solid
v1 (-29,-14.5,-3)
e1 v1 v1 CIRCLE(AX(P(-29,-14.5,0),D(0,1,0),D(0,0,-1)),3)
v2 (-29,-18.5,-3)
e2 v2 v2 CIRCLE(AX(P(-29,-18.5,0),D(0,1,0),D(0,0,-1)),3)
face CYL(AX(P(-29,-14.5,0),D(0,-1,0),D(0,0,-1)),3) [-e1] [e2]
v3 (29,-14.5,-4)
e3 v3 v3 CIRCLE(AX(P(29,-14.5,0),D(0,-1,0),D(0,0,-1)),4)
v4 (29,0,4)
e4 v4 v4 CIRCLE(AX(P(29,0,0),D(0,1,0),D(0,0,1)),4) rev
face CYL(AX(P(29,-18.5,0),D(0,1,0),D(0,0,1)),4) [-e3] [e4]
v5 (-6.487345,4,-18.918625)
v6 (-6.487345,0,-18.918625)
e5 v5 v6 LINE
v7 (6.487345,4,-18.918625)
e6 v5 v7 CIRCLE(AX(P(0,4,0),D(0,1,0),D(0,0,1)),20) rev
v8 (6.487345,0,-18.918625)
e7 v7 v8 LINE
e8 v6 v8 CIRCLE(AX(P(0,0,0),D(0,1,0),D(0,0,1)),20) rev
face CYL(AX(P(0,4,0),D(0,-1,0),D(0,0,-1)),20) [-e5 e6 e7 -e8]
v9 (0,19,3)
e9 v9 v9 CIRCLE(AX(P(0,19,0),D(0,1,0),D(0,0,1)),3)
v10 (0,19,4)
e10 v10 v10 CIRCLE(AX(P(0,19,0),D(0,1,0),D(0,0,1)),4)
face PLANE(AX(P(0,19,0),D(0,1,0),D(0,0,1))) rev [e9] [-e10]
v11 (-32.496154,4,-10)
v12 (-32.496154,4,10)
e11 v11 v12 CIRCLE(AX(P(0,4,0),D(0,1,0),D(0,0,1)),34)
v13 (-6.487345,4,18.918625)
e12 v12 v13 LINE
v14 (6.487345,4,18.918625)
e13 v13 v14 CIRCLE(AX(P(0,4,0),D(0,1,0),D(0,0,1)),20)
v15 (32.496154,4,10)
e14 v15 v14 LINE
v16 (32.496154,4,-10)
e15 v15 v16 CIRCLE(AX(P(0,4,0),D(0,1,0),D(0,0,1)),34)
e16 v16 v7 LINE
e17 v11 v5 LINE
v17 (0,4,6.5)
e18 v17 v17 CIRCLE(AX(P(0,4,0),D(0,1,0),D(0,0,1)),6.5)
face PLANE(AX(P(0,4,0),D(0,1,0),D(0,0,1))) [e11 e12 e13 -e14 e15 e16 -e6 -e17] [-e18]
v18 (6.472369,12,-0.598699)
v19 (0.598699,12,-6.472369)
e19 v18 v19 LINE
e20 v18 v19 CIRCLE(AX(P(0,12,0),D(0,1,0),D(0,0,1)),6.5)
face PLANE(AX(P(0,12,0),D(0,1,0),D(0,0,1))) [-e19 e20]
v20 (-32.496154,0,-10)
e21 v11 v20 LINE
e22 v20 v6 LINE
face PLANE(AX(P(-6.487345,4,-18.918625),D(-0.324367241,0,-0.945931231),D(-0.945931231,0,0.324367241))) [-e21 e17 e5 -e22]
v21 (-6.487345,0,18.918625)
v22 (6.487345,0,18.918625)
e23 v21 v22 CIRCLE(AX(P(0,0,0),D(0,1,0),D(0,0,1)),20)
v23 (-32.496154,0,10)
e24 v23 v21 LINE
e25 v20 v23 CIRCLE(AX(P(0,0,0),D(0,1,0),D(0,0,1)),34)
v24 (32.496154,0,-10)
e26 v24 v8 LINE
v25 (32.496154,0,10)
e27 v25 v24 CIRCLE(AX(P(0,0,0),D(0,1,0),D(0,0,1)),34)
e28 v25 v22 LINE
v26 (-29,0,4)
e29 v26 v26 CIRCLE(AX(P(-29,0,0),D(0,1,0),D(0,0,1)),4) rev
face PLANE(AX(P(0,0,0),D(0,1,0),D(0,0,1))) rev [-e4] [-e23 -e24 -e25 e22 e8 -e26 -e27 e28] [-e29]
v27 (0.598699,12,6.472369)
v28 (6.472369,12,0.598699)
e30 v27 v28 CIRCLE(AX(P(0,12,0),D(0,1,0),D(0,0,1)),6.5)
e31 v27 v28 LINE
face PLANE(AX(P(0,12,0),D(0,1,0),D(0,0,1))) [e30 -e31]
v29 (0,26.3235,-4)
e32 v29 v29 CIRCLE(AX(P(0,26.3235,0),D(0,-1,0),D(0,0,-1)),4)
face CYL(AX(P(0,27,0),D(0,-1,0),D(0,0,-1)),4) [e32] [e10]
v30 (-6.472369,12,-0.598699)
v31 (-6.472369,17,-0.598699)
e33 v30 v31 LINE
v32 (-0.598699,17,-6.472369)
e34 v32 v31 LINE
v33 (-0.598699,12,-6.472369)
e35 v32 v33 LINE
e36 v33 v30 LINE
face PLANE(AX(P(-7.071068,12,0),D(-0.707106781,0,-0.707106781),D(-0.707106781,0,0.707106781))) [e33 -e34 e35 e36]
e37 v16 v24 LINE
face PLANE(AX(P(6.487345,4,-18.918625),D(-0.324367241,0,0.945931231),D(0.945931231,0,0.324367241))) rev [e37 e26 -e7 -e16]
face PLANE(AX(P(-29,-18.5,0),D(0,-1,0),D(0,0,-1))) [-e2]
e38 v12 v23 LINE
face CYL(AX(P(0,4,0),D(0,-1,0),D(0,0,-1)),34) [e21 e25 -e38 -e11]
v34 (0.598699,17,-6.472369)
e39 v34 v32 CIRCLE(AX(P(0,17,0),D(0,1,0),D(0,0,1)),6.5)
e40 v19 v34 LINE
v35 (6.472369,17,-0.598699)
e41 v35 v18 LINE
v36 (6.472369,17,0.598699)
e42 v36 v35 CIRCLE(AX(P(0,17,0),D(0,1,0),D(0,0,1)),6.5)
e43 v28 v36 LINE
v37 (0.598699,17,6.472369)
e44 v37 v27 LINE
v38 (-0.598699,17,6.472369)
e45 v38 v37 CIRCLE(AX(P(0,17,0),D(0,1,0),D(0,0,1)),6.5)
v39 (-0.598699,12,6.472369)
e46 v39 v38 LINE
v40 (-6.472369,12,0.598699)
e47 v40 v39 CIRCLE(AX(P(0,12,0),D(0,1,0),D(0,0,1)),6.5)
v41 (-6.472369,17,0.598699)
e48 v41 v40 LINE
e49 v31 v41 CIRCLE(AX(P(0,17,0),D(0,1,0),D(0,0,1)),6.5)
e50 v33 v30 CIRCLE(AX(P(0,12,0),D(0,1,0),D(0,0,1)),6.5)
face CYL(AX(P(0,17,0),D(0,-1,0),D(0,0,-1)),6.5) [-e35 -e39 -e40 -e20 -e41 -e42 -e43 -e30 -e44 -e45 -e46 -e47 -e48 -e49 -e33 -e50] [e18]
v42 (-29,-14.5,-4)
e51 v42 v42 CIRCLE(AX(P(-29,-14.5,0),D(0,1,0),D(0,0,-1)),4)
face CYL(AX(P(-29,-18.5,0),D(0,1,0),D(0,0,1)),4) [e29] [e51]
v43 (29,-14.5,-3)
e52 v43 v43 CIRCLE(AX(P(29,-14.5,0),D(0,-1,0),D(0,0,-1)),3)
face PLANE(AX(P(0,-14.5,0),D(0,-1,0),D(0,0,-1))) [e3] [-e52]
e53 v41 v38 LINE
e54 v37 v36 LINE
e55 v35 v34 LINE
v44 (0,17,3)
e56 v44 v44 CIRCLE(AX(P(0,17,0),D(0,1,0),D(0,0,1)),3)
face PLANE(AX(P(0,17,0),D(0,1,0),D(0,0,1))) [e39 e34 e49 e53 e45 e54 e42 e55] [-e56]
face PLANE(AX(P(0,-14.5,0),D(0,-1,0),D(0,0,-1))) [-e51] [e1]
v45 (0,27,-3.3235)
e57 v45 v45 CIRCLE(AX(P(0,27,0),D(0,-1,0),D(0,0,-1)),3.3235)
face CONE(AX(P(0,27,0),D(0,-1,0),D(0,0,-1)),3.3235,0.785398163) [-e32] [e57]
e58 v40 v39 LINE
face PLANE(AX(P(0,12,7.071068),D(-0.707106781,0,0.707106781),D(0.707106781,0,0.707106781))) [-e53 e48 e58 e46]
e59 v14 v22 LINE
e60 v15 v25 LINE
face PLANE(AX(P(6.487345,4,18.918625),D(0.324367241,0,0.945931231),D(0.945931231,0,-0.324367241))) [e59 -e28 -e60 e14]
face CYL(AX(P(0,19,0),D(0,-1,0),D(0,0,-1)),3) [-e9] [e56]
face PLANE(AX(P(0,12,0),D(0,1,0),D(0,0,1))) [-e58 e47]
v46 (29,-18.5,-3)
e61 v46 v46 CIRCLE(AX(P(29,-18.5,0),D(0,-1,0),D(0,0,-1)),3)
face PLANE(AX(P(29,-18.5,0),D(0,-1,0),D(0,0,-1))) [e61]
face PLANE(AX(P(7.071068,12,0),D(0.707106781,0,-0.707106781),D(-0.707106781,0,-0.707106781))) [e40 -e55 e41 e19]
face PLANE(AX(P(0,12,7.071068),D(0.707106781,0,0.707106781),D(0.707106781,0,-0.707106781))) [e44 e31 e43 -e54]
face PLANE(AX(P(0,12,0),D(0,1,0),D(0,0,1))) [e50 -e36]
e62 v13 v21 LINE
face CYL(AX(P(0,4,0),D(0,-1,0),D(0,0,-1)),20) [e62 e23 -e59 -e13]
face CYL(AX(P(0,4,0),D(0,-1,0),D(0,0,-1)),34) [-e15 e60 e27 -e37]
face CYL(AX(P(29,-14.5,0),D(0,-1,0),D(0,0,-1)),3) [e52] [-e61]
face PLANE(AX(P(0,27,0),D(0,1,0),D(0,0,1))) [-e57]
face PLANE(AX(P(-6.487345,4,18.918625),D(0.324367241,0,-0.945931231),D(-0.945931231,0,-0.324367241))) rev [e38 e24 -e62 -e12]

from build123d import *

# Parameters (mm, degrees)
EXTRUDE_1_DEPTH      = 4
SKETCH_2_R           = 6.5
EXTRUDE_2_DEPTH      = 13
SKETCH_3_R           = 4
EXTRUDE_3_DEPTH      = 10
SKETCH_4_OUTSIDE_W   = 86.676
SKETCH_4_OUTSIDE_H   = 58.676
SKETCH_4_OUTSIDE_R   = 3
CUT_EXTRUDE_1_DEPTH  = 2
SKETCH_6_OUTSIDE_W   = 86.676
SKETCH_6_OUTSIDE_H   = 58.676
CUT_EXTRUDE_2_DEPTH  = 5
SKETCH_7_R           = 4
EXTRUDE_4_DEPTH      = 18.5
SKETCH_8_OUTSIDE_W   = 88.214
SKETCH_8_OUTSIDE_H   = 60.214
SKETCH_8_OUTSIDE_R   = 3
CUT_EXTRUDE_3_DEPTH  = 4
MIRROR_START         = -14.5
MIRROR_1_OUTLINE_R   = 4
MIRROR_1_DEPTH       = 14.5
MIRROR_START_2       = -18.5
MIRROR_1_2_OUTLINE_R = 3
MIRROR_1_2_DEPTH     = 4


# Read off the part's stored shape, not the designer's step: M8 机械螺纹 螺柱1, 镜向1
with BuildPart() as part:
    # 草图1 → 凸台-拉伸1 (new body)
    with BuildSketch(Plane(origin=(0, 0, 0), x_dir=(1, 0, 0), z_dir=(0, 1, 0))):
        with BuildLine():
            Line((-6.487344821, 18.918624611), (-32.496153619, 10))
            ThreePointArc((-32.496153619, 10), (-34, 0), (-32.496153619, -10))
            Line((-32.496153619, -10), (-6.487344821, -18.918624611))
            ThreePointArc((-6.487344821, -18.918624611), (0, -20), (6.487344821, -18.918624611))
            Line((6.487344821, -18.918624611), (32.496153619, -10))
            ThreePointArc((32.496153619, -10), (33.621936463, -5.056222749), (34, 0))
            ThreePointArc((34, 0), (33.621936463, 5.056222749), (32.496153619, 10))
            Line((32.496153619, 10), (6.487344821, 18.918624611))
            ThreePointArc((6.487344821, 18.918624611), (0, 20), (-6.487344821, 18.918624611))
        make_face()
    extrude(amount=EXTRUDE_1_DEPTH)

    # 草图2 → 凸台-拉伸2 (add)
    with BuildSketch(Plane(origin=(0, 4, 0), x_dir=(1, 0, 0), z_dir=(0, 1, 0))):
        with Locations(Location((0, 0, 0), (0, 0, 90))):
            Circle(SKETCH_2_R)
    extrude(amount=EXTRUDE_2_DEPTH)

    # 草图3 → 凸台-拉伸3 (add)
    with BuildSketch(Plane(origin=(0, 17, 0), x_dir=(1, 0, 0), z_dir=(0, 1, 0))):
        with Locations(Location((0, 0, 0), (0, 0, 270))):
            Circle(SKETCH_3_R)
    extrude(amount=EXTRUDE_3_DEPTH)

    # 草图4 outside → 切除-拉伸1 (cut)
    with BuildSketch(Plane(origin=(0, 17, 0), x_dir=(1, 0, 0), z_dir=(0, 1, 0))):
        Rectangle(SKETCH_4_OUTSIDE_W, SKETCH_4_OUTSIDE_H)
        with Locations(Location((0, 0, 0), (0, 0, 270))):
            Circle(SKETCH_4_OUTSIDE_R, mode=Mode.SUBTRACT)
    extrude(amount=CUT_EXTRUDE_1_DEPTH, mode=Mode.SUBTRACT)

    # M8 机械螺纹 螺柱1 outline → M8 机械螺纹 螺柱1 (revolve, cut)
    with BuildSketch(Plane.XY):
        Polygon((4, 27), (3.3235, 27), (4, 26.3235), align=None)
    revolve(axis=Axis((0, 0, 0), (0, 1, 0)), mode=Mode.SUBTRACT)

    # 草图6 outside → 切除-拉伸2 (cut)
    with BuildSketch(Plane(origin=(0, 17, 0), x_dir=(1, 0, 0), z_dir=(0, 1, 0))):
        Rectangle(SKETCH_6_OUTSIDE_W, SKETCH_6_OUTSIDE_H)
        Polygon((0, -7.071067812), (7.071067812, 0), (0, 7.071067812), (-7.071067812, 0), align=None, mode=Mode.SUBTRACT)
    extrude(amount=-CUT_EXTRUDE_2_DEPTH, mode=Mode.SUBTRACT)

    # 草图7 → 凸台-拉伸4 (add)
    with BuildSketch(Plane.XZ):
        with Locations(Location((29, 0, 0), (0, 0, 90))):
            Circle(SKETCH_7_R)
    extrude(amount=EXTRUDE_4_DEPTH)

    # 草图8 outside → 切除-拉伸3 (cut)
    with BuildSketch(Plane.XZ.offset(18.5)):
        Rectangle(SKETCH_8_OUTSIDE_W, SKETCH_8_OUTSIDE_H)
        with Locations(Location((29, 0, 0), (0, 0, 270))):
            Circle(SKETCH_8_OUTSIDE_R, mode=Mode.SUBTRACT)
    extrude(amount=-CUT_EXTRUDE_3_DEPTH, mode=Mode.SUBTRACT)

    # 镜向1 outline → 镜向1 (add)
    with BuildSketch(Plane(origin=(0, 0, 0), x_dir=(1, 0, 0), z_dir=(0, 1, 0)).offset(MIRROR_START)):
        with Locations((-29, 0)):
            Circle(MIRROR_1_OUTLINE_R)
    extrude(amount=MIRROR_1_DEPTH)

    # Mirror 1 2 outline → Mirror 1 2 (add)
    with BuildSketch(Plane(origin=(0, 0, 0), x_dir=(1, 0, 0), z_dir=(0, 1, 0)).offset(MIRROR_START_2)):
        with Locations((-29, 0)):
            Circle(MIRROR_1_2_OUTLINE_R)
    extrude(amount=MIRROR_1_2_DEPTH)


solid = part.part
